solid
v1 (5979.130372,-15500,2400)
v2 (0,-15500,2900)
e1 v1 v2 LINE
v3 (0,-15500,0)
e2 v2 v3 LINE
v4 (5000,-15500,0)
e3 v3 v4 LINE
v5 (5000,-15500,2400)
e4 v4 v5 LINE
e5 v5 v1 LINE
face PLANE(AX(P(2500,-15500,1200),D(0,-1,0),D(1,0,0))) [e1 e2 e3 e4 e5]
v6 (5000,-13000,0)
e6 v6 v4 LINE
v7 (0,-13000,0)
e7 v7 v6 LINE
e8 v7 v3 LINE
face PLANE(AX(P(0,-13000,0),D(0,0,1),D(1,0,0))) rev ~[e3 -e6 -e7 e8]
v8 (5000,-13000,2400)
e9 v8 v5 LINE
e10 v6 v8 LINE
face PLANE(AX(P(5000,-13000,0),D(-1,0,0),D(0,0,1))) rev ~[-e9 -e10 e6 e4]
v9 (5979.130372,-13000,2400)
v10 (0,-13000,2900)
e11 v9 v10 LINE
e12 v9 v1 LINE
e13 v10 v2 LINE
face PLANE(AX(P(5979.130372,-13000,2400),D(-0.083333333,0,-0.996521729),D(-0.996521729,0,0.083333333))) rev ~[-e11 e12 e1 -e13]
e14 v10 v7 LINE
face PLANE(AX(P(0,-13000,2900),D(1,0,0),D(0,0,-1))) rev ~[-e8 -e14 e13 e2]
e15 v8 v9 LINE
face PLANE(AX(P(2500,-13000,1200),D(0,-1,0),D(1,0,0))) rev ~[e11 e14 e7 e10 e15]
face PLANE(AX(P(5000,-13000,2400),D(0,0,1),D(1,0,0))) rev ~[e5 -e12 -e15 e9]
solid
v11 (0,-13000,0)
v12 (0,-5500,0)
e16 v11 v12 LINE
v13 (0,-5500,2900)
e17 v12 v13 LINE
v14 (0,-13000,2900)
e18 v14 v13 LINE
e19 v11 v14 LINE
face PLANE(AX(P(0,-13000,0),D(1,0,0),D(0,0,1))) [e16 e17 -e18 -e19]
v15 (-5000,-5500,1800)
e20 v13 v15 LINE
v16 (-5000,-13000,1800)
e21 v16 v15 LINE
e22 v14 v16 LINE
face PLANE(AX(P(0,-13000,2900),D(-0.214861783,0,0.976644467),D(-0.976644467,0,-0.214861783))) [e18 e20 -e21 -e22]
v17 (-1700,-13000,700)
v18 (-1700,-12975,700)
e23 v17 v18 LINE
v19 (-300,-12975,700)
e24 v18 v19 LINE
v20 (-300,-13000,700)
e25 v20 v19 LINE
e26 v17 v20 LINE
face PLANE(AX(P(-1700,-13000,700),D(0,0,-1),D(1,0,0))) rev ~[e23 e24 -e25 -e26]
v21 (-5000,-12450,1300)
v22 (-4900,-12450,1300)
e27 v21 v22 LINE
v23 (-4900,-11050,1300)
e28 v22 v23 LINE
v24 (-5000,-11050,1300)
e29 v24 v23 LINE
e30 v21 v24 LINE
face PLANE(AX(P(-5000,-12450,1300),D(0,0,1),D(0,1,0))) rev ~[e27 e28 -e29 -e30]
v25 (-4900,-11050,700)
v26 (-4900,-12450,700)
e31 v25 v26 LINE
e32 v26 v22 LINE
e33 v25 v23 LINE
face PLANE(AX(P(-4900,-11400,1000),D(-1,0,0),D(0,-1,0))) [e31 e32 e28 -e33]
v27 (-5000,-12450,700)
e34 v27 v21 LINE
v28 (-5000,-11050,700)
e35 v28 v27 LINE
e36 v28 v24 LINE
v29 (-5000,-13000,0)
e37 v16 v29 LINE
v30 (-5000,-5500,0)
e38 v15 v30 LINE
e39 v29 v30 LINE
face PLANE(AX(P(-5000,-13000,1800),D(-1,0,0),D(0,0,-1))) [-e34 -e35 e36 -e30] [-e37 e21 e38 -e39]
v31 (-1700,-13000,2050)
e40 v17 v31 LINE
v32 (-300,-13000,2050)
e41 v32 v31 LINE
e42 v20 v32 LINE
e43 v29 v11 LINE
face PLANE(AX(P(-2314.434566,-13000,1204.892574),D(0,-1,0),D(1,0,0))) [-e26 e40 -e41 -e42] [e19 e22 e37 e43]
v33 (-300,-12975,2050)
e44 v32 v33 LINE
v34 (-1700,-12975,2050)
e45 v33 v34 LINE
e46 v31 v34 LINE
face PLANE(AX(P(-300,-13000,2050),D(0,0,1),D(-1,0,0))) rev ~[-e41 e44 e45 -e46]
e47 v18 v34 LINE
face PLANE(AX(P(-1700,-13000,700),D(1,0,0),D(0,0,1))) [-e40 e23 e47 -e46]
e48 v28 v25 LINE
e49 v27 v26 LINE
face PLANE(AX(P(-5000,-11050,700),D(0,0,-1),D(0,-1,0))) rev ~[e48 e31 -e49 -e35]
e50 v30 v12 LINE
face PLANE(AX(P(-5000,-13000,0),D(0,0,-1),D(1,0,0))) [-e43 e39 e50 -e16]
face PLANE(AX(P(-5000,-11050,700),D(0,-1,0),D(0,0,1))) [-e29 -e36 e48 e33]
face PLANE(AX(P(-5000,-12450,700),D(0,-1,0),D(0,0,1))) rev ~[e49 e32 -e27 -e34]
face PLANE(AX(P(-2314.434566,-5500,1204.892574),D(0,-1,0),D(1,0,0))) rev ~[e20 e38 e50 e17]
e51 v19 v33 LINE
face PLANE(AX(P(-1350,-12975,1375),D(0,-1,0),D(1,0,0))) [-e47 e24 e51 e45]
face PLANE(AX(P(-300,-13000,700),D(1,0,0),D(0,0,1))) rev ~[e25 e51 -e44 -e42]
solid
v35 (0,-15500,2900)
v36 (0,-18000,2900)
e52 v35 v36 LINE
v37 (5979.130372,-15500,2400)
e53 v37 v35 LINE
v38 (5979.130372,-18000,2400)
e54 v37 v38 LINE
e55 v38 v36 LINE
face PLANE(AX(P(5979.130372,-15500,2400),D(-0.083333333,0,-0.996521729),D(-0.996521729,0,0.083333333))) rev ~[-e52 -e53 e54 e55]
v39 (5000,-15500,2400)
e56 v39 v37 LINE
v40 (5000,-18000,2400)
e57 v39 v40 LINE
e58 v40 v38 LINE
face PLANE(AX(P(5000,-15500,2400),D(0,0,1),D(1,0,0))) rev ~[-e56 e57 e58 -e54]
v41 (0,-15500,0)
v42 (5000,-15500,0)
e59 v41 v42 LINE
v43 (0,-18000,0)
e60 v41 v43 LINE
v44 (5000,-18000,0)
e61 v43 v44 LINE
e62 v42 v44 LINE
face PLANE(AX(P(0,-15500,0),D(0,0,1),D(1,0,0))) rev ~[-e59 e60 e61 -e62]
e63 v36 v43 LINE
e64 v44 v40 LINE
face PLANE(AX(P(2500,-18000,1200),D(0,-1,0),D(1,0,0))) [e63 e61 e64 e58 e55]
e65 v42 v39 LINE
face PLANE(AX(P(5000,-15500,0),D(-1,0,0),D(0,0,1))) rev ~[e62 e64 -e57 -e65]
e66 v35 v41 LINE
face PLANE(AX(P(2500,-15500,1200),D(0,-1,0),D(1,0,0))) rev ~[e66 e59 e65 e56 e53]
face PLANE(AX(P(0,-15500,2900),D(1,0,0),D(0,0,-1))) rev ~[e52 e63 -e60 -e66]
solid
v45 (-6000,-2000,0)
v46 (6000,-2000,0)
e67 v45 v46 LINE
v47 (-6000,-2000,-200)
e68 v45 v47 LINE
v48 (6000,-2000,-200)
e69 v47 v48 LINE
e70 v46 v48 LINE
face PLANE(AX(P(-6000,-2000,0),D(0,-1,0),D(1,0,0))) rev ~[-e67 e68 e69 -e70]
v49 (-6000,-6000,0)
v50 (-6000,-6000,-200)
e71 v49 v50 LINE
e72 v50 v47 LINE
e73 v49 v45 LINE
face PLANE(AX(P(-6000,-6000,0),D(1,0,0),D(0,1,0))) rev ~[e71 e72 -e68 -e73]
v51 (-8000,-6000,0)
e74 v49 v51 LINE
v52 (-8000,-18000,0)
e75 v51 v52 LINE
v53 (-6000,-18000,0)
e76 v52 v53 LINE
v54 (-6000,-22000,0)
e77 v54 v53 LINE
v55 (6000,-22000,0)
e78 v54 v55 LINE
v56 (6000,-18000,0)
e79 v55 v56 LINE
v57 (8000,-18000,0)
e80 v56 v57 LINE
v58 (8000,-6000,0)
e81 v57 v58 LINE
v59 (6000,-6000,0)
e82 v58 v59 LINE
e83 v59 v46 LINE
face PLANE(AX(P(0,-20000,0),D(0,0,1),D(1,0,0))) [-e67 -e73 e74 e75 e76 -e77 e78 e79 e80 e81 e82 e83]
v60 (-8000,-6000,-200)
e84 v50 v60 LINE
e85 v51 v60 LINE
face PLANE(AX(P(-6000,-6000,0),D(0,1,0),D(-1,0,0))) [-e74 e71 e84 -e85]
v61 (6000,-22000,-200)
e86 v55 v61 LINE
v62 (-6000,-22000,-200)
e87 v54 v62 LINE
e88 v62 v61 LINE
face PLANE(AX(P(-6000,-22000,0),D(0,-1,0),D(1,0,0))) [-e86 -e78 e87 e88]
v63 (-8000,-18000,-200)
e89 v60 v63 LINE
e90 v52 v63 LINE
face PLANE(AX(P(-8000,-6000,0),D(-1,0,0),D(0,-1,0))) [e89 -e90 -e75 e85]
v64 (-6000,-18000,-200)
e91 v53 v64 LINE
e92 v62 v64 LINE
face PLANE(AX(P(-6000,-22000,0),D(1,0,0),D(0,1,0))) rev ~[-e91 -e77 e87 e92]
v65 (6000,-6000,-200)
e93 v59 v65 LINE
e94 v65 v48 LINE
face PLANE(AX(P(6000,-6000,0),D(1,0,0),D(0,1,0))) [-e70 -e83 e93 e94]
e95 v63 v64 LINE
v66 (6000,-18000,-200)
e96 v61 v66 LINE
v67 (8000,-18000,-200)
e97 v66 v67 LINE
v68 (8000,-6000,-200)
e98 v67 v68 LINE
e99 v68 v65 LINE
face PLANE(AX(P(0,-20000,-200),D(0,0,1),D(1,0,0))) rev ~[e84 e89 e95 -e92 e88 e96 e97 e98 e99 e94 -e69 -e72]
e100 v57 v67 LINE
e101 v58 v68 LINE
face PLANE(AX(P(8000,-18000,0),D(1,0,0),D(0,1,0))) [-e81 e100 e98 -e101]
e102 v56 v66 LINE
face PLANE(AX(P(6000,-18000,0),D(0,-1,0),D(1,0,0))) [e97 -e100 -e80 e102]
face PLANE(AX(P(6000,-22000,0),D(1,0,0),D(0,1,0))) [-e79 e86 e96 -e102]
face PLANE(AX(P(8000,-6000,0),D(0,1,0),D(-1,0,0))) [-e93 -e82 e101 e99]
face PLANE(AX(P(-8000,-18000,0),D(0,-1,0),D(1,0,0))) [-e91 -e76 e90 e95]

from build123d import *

# Parameters (mm, degrees)
F2_W      = 5000
F2_H      = 2400
F3_DEPTH  = 2500
F4_DEPTH  = 2500
F5_DEPTH  = 7500
F6_W      = 12000
F6_H      = 4000
F7_DEPTH  = 200
F8_W      = 700
F8_H      = 600
F9_DEPTH  = 100
F10_W     = 700
F10_H     = 1350
F11_DEPTH = 25


# Not quite as in the source:
# - a feature names something its author has since deleted; it is built from what else it names


with BuildPart() as f3:
    # F2 (on offset) → F3 (new body)
    with BuildSketch(Plane.XZ.offset(13000)):
        with Locations((2500, 1200)):
            Rectangle(F2_W, F2_H)
        Polygon((0, 2900), (0, 2400), (5000, 2400), (5979.1303715507, 2400), align=None)
    extrude(amount=F3_DEPTH)


with BuildPart() as f4:
    # F4 (new): a face of the model
    f4_faces = [f3.part.faces().sort_by_distance(p)[0] for p in [
        (2500, -15500, 66.4529909033),
    ]]
    extrude(f4_faces, amount=F4_DEPTH)


with BuildPart() as f5:
    # F2 (on offset) → F5 (new body)
    with BuildSketch(Plane.XZ.offset(13000)):
        Polygon((-5000, 0), (0, 0), (0, 2400), (0, 2900), (-5000, 1800), align=None)
    extrude(amount=-F5_DEPTH)

    # F8 (on face) → F9 (cut)
    with BuildSketch(Plane(origin=(-5000, 0, 0), x_dir=(0, -1, 0), z_dir=(-1, 0, 0))):
        with Locations((11400, 1000)):
            Rectangle(F8_W, F8_H)
        with Locations((12100, 1000)):
            Rectangle(F8_W, F8_H)
    extrude(amount=-F9_DEPTH, mode=Mode.SUBTRACT)

    # F10 (on face) → F11 (cut)
    with BuildSketch(Plane.XZ.offset(13000)):
        with Locations((-1350, 1375)):
            Rectangle(F10_W, F10_H)
        with Locations((-650, 1375)):
            Rectangle(F10_W, F10_H)
    extrude(amount=-F11_DEPTH, mode=Mode.SUBTRACT)


with BuildPart() as f7:
    # F6 (on Top) → F7 (new body)
    with BuildSketch(Plane.XY):
        with Locations((0, -20000)):
            Rectangle(F6_W, F6_H)
        Polygon((-6000, -6000), (-8000, -6000), (-8000, -18000), (-6000, -18000), (6000, -18000), (8000, -18000), (8000, -6000), (6000, -6000), align=None)
        with Locations((0, -4000)):
            Rectangle(F6_W, F6_H)
    extrude(amount=-F7_DEPTH)


solid = Compound([f3.part, f4.part, f5.part, f7.part])
